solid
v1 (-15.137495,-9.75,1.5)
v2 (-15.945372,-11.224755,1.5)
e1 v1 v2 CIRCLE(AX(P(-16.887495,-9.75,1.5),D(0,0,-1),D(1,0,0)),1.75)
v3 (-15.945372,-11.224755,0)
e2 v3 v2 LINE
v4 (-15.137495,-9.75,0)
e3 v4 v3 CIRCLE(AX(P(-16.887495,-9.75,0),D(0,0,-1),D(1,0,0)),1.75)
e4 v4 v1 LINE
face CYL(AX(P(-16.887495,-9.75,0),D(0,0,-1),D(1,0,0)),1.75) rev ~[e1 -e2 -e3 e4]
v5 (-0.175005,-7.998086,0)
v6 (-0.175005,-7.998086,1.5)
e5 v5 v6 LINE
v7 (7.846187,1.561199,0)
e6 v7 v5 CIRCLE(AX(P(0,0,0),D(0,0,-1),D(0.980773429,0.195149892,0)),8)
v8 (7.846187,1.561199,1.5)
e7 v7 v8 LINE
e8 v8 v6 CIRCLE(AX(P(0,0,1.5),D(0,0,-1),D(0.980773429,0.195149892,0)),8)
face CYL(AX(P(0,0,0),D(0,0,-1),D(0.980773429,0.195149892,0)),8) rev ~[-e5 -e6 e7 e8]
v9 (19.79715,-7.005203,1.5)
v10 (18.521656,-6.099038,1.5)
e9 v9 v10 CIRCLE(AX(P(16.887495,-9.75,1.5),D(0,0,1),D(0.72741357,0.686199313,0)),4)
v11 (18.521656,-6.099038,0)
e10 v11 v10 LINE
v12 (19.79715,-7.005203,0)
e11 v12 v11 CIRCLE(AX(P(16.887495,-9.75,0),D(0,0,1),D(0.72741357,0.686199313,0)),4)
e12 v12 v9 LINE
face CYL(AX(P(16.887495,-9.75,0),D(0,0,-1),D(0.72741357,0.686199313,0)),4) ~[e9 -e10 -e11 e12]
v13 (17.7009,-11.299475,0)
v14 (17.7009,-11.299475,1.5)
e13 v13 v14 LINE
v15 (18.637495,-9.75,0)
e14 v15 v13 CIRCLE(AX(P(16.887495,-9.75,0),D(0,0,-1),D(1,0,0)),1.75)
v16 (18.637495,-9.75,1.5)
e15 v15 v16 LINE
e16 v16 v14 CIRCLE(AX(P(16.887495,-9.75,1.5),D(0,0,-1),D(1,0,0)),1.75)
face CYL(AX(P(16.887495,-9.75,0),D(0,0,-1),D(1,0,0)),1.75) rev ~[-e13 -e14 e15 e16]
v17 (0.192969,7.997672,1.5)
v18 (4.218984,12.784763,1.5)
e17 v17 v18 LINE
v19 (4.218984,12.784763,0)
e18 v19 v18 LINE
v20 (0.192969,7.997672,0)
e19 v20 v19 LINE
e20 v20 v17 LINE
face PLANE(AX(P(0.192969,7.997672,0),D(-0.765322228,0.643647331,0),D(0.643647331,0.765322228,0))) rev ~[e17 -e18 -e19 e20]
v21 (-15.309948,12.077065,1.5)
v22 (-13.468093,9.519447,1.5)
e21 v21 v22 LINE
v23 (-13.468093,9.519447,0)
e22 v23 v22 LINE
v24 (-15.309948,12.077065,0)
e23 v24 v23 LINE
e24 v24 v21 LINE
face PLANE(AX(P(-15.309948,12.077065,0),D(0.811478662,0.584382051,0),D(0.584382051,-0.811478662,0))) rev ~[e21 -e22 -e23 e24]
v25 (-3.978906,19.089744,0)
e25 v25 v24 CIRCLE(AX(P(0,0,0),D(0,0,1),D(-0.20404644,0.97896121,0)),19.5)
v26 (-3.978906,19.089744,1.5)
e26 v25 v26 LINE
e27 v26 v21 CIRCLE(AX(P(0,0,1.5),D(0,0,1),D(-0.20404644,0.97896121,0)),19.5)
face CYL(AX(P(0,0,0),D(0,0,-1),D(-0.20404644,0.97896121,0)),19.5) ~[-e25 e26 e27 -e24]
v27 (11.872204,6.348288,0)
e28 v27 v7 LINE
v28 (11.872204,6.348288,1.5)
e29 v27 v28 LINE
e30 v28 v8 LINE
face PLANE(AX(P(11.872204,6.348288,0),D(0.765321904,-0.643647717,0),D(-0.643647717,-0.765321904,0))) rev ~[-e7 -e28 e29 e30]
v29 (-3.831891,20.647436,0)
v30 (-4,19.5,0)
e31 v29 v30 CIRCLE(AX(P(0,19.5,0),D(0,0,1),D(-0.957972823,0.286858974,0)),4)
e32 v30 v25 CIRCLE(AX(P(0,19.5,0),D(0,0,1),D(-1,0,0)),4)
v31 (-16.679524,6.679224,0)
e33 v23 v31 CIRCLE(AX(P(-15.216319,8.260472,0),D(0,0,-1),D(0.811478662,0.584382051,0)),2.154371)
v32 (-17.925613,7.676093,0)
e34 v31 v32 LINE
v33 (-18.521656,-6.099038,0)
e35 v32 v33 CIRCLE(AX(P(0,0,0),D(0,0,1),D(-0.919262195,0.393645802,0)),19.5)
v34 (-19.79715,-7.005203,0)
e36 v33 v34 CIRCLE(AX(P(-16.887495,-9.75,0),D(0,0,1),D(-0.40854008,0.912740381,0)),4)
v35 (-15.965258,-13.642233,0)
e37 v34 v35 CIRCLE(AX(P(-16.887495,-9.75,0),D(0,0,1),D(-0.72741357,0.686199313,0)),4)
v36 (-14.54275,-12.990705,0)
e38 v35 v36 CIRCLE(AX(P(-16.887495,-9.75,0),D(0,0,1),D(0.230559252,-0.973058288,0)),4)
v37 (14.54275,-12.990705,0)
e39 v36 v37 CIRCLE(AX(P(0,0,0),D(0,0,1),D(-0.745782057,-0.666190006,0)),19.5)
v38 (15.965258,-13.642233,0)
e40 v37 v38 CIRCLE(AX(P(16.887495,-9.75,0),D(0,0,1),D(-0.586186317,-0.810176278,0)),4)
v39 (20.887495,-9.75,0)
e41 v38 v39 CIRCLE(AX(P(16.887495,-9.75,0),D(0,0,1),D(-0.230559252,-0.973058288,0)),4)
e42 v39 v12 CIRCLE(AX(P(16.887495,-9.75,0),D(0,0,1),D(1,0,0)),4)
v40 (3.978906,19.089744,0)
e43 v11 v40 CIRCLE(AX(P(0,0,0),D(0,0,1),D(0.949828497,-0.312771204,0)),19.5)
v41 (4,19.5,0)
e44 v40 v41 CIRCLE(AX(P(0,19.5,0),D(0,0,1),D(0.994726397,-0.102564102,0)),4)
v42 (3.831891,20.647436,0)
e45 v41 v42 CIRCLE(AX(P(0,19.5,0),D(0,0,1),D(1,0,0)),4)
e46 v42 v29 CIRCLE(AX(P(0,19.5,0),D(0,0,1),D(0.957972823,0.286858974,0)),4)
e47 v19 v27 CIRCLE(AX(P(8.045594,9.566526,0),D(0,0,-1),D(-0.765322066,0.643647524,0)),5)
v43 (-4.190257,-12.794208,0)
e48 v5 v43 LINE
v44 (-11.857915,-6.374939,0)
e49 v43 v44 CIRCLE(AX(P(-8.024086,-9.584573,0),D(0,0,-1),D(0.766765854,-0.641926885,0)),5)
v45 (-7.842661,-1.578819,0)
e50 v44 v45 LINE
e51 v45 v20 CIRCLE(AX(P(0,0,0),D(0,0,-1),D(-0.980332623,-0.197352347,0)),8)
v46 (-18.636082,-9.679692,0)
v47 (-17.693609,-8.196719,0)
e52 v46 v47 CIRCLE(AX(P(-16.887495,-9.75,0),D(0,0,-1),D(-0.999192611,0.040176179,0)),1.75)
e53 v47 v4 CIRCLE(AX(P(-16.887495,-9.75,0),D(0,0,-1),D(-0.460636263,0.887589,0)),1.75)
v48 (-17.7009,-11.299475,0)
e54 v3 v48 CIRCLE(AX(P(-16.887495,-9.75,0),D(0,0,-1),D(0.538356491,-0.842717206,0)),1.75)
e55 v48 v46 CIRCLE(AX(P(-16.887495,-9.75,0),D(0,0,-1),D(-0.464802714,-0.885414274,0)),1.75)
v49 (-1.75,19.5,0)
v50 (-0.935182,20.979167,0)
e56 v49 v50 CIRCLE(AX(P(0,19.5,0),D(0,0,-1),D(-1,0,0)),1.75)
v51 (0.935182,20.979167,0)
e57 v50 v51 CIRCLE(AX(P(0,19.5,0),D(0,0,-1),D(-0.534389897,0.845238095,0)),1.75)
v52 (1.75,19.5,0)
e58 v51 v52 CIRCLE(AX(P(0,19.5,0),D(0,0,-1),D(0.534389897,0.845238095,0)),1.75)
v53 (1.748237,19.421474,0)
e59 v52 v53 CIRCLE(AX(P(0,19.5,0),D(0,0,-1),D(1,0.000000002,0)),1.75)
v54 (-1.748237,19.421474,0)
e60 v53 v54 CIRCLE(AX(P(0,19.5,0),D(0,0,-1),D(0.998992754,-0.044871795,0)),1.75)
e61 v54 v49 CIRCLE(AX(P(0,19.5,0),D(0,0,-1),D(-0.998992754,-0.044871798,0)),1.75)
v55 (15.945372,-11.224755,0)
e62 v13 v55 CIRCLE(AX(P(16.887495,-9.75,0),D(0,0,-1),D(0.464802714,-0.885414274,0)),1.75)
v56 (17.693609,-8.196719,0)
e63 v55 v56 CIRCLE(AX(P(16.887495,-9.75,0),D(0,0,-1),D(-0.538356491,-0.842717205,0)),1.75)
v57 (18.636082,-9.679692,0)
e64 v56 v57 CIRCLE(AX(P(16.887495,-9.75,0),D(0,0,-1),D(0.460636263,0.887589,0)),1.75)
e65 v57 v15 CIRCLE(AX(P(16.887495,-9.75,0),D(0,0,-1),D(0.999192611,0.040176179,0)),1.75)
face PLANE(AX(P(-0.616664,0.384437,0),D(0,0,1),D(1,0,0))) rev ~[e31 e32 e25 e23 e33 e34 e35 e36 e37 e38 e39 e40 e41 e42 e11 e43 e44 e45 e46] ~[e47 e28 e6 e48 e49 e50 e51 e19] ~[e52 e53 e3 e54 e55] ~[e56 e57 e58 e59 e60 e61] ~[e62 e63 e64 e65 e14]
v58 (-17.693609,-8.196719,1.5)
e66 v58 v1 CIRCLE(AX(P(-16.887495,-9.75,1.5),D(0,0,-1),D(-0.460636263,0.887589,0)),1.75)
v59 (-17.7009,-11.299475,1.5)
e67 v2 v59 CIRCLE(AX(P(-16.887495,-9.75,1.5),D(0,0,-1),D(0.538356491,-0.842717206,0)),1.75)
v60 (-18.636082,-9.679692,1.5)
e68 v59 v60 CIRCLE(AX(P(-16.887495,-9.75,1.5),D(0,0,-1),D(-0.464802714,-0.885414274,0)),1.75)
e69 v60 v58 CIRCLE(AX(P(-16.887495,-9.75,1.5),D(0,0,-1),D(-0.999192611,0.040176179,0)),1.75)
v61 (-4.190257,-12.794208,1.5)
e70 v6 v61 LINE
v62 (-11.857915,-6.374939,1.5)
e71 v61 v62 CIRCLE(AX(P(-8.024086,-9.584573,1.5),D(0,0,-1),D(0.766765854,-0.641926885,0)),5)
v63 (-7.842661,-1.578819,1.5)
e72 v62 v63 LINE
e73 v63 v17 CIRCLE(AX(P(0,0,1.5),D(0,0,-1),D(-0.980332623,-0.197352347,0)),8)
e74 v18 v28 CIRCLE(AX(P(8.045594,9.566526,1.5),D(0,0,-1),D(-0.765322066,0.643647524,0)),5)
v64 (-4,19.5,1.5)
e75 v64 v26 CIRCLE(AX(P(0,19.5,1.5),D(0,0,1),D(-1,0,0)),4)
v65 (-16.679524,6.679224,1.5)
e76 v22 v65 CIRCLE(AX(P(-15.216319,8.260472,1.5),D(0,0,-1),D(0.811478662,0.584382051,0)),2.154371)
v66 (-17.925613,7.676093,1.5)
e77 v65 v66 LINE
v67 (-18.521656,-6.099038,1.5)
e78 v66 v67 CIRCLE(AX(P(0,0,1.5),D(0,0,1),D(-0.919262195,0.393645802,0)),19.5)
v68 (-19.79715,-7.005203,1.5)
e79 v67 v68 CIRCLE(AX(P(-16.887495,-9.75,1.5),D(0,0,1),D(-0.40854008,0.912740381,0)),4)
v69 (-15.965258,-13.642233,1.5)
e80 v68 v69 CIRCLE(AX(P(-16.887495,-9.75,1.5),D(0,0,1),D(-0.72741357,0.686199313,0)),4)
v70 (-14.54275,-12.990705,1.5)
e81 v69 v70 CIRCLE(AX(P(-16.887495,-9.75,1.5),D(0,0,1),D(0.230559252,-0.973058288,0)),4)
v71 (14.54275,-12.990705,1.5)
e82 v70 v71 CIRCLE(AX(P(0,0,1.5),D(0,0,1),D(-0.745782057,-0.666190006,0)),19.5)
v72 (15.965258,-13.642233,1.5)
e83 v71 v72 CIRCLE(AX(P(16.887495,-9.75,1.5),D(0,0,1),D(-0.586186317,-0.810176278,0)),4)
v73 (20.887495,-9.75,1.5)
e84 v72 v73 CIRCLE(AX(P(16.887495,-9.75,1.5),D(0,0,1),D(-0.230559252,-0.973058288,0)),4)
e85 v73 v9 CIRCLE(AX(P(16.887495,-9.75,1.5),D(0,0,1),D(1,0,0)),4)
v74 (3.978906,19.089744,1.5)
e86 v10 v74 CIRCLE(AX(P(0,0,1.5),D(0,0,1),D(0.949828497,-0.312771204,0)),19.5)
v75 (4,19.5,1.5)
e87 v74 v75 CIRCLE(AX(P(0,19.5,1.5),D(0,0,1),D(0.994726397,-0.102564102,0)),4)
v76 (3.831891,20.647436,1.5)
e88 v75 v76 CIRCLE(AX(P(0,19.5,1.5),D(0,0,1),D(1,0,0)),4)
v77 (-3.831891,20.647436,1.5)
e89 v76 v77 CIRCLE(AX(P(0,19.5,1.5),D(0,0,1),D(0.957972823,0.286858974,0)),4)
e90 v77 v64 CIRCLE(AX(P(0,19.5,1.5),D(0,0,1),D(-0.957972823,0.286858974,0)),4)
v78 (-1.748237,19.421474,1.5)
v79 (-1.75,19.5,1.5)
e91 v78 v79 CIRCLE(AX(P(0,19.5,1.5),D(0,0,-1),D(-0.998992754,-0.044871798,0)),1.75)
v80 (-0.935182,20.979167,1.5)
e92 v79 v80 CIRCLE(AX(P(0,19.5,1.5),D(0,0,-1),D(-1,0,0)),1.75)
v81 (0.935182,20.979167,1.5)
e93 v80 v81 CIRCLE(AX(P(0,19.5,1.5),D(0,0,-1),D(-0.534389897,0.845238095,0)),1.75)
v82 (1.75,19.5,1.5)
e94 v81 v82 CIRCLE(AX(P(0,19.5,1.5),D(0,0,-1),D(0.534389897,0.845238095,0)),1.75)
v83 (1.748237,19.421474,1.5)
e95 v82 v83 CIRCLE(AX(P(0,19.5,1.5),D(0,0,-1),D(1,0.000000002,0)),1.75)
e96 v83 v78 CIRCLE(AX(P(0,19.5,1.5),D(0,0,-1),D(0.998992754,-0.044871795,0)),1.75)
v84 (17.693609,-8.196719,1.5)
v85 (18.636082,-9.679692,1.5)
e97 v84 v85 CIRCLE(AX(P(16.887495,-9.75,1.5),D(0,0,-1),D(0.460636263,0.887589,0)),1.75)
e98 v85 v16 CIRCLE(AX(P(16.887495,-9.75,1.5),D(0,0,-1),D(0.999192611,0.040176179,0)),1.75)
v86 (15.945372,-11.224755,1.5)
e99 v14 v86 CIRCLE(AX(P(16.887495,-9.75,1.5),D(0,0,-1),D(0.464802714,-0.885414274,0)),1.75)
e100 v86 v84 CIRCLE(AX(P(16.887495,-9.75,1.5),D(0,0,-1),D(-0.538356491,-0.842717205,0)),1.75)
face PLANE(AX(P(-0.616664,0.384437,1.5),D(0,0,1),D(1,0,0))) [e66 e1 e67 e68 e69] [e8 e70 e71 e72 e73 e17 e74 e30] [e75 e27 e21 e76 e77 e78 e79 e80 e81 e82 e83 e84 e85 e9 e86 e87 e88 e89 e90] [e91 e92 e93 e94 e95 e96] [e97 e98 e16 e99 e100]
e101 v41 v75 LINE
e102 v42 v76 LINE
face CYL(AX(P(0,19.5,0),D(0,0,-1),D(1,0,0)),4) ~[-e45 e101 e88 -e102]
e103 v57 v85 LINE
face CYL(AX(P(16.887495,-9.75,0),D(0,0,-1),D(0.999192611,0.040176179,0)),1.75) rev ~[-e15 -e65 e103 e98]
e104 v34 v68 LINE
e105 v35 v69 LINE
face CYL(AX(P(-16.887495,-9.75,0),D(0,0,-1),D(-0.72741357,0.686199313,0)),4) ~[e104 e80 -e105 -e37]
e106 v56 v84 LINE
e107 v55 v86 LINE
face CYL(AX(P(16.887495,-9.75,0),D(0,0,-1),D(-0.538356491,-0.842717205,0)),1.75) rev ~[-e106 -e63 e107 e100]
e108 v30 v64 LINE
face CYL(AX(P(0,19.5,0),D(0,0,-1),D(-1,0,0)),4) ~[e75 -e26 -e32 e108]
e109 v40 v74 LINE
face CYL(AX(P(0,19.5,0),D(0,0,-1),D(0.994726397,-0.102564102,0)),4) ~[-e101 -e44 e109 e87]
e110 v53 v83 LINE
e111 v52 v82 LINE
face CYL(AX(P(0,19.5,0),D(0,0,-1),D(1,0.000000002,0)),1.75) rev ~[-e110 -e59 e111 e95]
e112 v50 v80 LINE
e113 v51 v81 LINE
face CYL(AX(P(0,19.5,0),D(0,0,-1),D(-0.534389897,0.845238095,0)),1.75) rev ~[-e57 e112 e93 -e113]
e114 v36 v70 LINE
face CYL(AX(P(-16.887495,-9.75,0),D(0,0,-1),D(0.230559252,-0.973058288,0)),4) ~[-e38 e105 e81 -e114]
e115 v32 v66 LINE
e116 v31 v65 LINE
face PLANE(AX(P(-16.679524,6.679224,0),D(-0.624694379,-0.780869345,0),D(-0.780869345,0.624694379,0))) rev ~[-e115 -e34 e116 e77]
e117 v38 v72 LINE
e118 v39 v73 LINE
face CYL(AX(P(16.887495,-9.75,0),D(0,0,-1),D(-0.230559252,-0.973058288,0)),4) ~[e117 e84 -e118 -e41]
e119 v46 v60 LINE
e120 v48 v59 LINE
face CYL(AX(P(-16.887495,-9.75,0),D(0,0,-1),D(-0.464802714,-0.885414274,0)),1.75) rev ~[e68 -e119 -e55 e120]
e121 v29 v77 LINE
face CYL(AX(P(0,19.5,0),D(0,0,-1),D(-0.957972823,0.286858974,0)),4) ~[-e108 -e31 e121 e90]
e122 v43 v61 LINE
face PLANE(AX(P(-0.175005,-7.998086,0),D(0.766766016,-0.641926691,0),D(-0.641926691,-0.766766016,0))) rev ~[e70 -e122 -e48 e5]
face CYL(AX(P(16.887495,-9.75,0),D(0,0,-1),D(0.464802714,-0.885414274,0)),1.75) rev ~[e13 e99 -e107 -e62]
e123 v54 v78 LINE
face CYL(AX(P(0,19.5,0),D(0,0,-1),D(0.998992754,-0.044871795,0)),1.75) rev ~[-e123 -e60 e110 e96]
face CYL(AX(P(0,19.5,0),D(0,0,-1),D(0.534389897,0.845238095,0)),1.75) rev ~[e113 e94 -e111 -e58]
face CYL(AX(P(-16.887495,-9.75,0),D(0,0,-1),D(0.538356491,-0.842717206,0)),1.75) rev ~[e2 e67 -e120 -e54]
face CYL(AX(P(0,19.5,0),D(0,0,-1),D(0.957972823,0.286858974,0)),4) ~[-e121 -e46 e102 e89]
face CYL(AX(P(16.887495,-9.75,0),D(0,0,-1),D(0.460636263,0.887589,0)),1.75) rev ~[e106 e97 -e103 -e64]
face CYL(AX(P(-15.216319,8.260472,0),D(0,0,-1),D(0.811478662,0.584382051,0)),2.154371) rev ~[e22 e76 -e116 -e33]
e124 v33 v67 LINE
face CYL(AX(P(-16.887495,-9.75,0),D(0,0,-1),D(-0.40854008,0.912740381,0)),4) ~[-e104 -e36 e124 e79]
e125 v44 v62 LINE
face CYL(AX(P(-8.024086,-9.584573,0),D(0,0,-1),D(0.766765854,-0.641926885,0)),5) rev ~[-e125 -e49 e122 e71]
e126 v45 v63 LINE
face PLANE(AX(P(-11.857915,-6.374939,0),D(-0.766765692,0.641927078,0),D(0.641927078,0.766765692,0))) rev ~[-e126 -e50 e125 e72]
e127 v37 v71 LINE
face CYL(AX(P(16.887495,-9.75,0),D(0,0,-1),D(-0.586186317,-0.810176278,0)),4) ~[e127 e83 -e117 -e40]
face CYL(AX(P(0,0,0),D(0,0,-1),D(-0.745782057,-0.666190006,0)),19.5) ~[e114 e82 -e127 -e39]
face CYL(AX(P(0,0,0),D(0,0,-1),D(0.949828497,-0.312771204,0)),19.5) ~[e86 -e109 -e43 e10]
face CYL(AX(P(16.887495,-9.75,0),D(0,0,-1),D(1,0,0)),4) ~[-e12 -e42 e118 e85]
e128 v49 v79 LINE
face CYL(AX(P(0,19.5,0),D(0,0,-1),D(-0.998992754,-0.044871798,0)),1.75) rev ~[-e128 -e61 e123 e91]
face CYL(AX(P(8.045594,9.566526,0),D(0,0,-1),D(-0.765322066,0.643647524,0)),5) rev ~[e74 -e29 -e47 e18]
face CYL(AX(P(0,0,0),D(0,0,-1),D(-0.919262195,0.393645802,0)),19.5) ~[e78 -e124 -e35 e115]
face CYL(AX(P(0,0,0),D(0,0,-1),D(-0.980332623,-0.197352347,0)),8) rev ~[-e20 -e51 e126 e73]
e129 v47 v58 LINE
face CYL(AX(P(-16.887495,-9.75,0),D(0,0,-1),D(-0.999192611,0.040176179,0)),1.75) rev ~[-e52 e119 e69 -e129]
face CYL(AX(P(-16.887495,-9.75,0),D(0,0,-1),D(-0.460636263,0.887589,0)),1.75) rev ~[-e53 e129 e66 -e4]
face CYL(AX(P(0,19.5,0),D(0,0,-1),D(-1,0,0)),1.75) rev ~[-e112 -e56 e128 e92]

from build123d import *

# Parameters (mm, degrees)
F1_DEPTH = 1.5


# Not quite as in the source:
# - a feature names something its author has since deleted; it is built from what else it names


with BuildPart() as f1:
    # F0 (on Top) → F1 (new body)
    with BuildSketch(Plane.XY):
        with BuildLine():
            Line((-16.6795244343, 6.6792241971), (-17.9256127972, 7.6760931368))
            ThreePointArc((-17.9256127972, 7.6760931368), (-19.4817711686, 0.8429662711), (-18.5216556944, -6.0990384764))
            ThreePointArc((-18.5216556944, -6.0990384764), (-18.1379825879, -7.1598594707), (-17.6936088333, -8.1967192494))
            ThreePointArc((-17.6936088333, -8.1967192494), (-15.9787045712, -8.2544735786), (-15.1374953738, -9.75))
            ThreePointArc((-15.1374953738, -9.75), (-15.3526962413, -10.5907684717), (-15.9453715143, -11.2247551096))
            ThreePointArc((-15.9453715143, -11.2247551096), (-15.2696114831, -12.1280239592), (-14.5427501065, -12.9907051133))
            ThreePointArc((-14.5427501065, -12.9907051133), (0, -19.5), (14.5427501065, -12.9907051133))
            ThreePointArc((14.5427501065, -12.9907051133), (13.4233937587, -7.75), (18.5216556944, -6.0990384764))
            ThreePointArc((18.5216556944, -6.0990384764), (16.8874953738, 9.75), (3.978905588, 19.0897435897))
            ThreePointArc((3.978905588, 19.0897435897), (0, 15.5), (-3.978905588, 19.0897435897))
            ThreePointArc((-3.978905588, 19.0897435897), (-10.2620358256, 16.5813335023), (-15.3099476357, 12.0770651813))
            Line((-15.3099476357, 12.0770651813), (-13.4680928187, 9.5194474719))
            ThreePointArc((-13.4680928187, 9.5194474719), (-13.7890746093, 6.6466910805), (-16.6795244343, 6.6792241971))
        make_face()
        with BuildLine():
            ThreePointArc((4.2189837175, 12.7847634468), (11.2638316679, 13.3931361584), (11.8722043795, 6.348288208))
            Line((11.8722043795, 6.348288208), (7.846187435, 1.5611991336))
            ThreePointArc((7.846187435, 1.5611991336), (6.128355545, -5.1423008775), (-0.1750048611, -7.9980856021))
            Line((-0.1750048611, -7.9980856021), (-4.1902567902, -12.7942075969))
            ThreePointArc((-4.1902567902, -12.7942075969), (-11.2337204833, -13.4184024423), (-11.8579153287, -6.3749387493))
            Line((-11.8579153287, -6.3749387493), (-7.8426609809, -1.5788187794))
            ThreePointArc((-7.8426609809, -1.5788187794), (-6.128355545, 5.1423008775), (0.1929691871, 7.9976723422))
            Line((0.1929691871, 7.9976723422), (4.2189837175, 12.7847634468))
        make_face(mode=Mode.SUBTRACT)
        with BuildLine():
            ThreePointArc((-17.6936088333, -8.1967192494), (-18.1379825879, -7.1598594707), (-18.5216556944, -6.0990384764))
            ThreePointArc((-18.5216556944, -6.0990384764), (-19.2041408378, -6.4891483024), (-19.7971496554, -7.0052027467))
            ThreePointArc((-19.7971496554, -7.0052027467), (-19.2630878929, -8.3626218874), (-18.6360824437, -9.6796916868))
            ThreePointArc((-18.6360824437, -9.6796916868), (-18.36446034, -8.8113443184), (-17.6936088333, -8.1967192494))
        make_face()
        with BuildLine():
            ThreePointArc((-18.6360824437, -9.6796916868), (-19.2630878929, -8.3626218874), (-19.7971496554, -7.0052027467))
            ThreePointArc((-19.7971496554, -7.0052027467), (-20.3515969889, -11.75), (-15.965258365, -13.6422331507))
            ThreePointArc((-15.965258365, -13.6422331507), (-16.8737869432, -12.5010125269), (-17.7009001234, -11.2994749799))
            ThreePointArc((-17.7009001234, -11.2994749799), (-18.4030398304, -10.625), (-18.6360824437, -9.6796916868))
        make_face()
        with BuildLine():
            ThreePointArc((-14.5427501065, -12.9907051133), (-15.2696114831, -12.1280239592), (-15.9453715143, -11.2247551096))
            ThreePointArc((-15.9453715143, -11.2247551096), (-16.8130781912, -11.498417022), (-17.7009001234, -11.2994749799))
            ThreePointArc((-17.7009001234, -11.2994749799), (-16.8737869432, -12.5010125269), (-15.965258365, -13.6422331507))
            ThreePointArc((-15.965258365, -13.6422331507), (-15.2218376977, -13.3866996722), (-14.5427501065, -12.9907051133))
        make_face()
        with BuildLine():
            ThreePointArc((17.7009001234, -11.2994749799), (16.8737869432, -12.5010125269), (15.965258365, -13.6422331507))
            ThreePointArc((15.965258365, -13.6422331507), (19.3685286228, -12.8875904796), (20.8874953738, -9.75))
            ThreePointArc((20.8874953738, -9.75), (20.6049284348, -8.2732835625), (19.7971496554, -7.0052027467))
            ThreePointArc((19.7971496554, -7.0052027467), (19.2630878929, -8.3626218874), (18.6360824437, -9.6796916868))
            ThreePointArc((18.6360824437, -9.6796916868), (18.6371421056, -9.7148387455), (18.6374953738, -9.75))
            ThreePointArc((18.6374953738, -9.75), (18.3851532639, -10.6552739056), (17.7009001234, -11.2994749799))
        make_face()
        with BuildLine():
            ThreePointArc((14.5427501065, -12.9907051133), (15.2218376977, -13.3866996722), (15.965258365, -13.6422331507))
            ThreePointArc((15.965258365, -13.6422331507), (16.8737869432, -12.5010125269), (17.7009001234, -11.2994749799))
            ThreePointArc((17.7009001234, -11.2994749799), (16.8130781912, -11.498417022), (15.9453715143, -11.2247551096))
            ThreePointArc((15.9453715143, -11.2247551096), (15.2696114831, -12.1280239592), (14.5427501065, -12.9907051133))
        make_face()
        with BuildLine():
            ThreePointArc((-4, 19.5), (-3.994722916, 19.2946008177), (-3.978905588, 19.0897435897))
            ThreePointArc((-3.978905588, 19.0897435897), (-2.8683711048, 19.2878834299), (-1.748237319, 19.421474359))
            ThreePointArc((-1.748237319, 19.421474359), (-1.7495592743, 19.4607272889), (-1.75, 19.5))
            Line((-1.75, 19.5), (-4, 19.5))
        make_face()
        with BuildLine():
            ThreePointArc((-1.748237319, 19.421474359), (-2.8683711048, 19.2878834299), (-3.978905588, 19.0897435897))
            ThreePointArc((-3.978905588, 19.0897435897), (0, 15.5), (3.978905588, 19.0897435897))
            ThreePointArc((3.978905588, 19.0897435897), (2.8683711048, 19.2878834299), (1.748237319, 19.421474359))
            ThreePointArc((1.748237319, 19.421474359), (0, 17.75), (-1.748237319, 19.421474359))
        make_face()
        with BuildLine():
            ThreePointArc((18.5216556944, -6.0990384764), (13.4233937587, -7.75), (14.5427501065, -12.9907051133))
            ThreePointArc((14.5427501065, -12.9907051133), (15.2696114831, -12.1280239592), (15.9453715143, -11.2247551096))
            ThreePointArc((15.9453715143, -11.2247551096), (15.3719509172, -8.875), (17.6936088333, -8.1967192493))
            ThreePointArc((17.6936088333, -8.1967192493), (18.1379825879, -7.1598594707), (18.5216556944, -6.0990384764))
        make_face()
        with BuildLine():
            ThreePointArc((-3.8318912904, 20.6474358974), (-3.9577496865, 20.0798425814), (-4, 19.5))
            Line((-4, 19.5), (-1.75, 19.5))
            ThreePointArc((-1.75, 19.5), (-1.5328191447, 20.3443728263), (-0.9351823203, 20.9791666667))
            ThreePointArc((-0.9351823203, 20.9791666667), (-2.3893009497, 20.8636344143), (-3.8318912904, 20.6474358974))
        make_face()
        with BuildLine():
            ThreePointArc((1.748237319, 19.421474359), (2.8683711048, 19.2878834299), (3.978905588, 19.0897435897))
            ThreePointArc((3.978905588, 19.0897435897), (3.994722916, 19.2946008177), (4, 19.5))
            Line((4, 19.5), (1.75, 19.5))
            ThreePointArc((1.75, 19.5), (1.7495592743, 19.4607272889), (1.748237319, 19.421474359))
        make_face()
        with BuildLine():
            ThreePointArc((3.8318912904, 20.6474358974), (0, 23.5), (-3.8318912904, 20.6474358974))
            ThreePointArc((-3.8318912904, 20.6474358974), (-2.3893009497, 20.8636344143), (-0.9351823203, 20.9791666667))
            ThreePointArc((-0.9351823203, 20.9791666667), (0, 21.25), (0.9351823203, 20.9791666667))
            ThreePointArc((0.9351823203, 20.9791666667), (2.3893009497, 20.8636344143), (3.8318912904, 20.6474358974))
        make_face()
        with BuildLine():
            ThreePointArc((19.7971496554, -7.0052027467), (19.2041408378, -6.4891483024), (18.5216556944, -6.0990384764))
            ThreePointArc((18.5216556944, -6.0990384764), (18.1379825879, -7.1598594707), (17.6936088333, -8.1967192493))
            ThreePointArc((17.6936088333, -8.1967192493), (18.36446034, -8.8113443184), (18.6360824437, -9.6796916868))
            ThreePointArc((18.6360824437, -9.6796916868), (19.2630878929, -8.3626218874), (19.7971496554, -7.0052027467))
        make_face()
        with BuildLine():
            Line((1.75, 19.5), (4, 19.5))
            ThreePointArc((4, 19.5), (3.9577496865, 20.0798425814), (3.8318912904, 20.6474358974))
            ThreePointArc((3.8318912904, 20.6474358974), (2.3893009497, 20.8636344143), (0.9351823203, 20.9791666667))
            ThreePointArc((0.9351823203, 20.9791666667), (1.5328191447, 20.3443728263), (1.75, 19.5))
        make_face()
    extrude(amount=F1_DEPTH)


solid = f1.part
